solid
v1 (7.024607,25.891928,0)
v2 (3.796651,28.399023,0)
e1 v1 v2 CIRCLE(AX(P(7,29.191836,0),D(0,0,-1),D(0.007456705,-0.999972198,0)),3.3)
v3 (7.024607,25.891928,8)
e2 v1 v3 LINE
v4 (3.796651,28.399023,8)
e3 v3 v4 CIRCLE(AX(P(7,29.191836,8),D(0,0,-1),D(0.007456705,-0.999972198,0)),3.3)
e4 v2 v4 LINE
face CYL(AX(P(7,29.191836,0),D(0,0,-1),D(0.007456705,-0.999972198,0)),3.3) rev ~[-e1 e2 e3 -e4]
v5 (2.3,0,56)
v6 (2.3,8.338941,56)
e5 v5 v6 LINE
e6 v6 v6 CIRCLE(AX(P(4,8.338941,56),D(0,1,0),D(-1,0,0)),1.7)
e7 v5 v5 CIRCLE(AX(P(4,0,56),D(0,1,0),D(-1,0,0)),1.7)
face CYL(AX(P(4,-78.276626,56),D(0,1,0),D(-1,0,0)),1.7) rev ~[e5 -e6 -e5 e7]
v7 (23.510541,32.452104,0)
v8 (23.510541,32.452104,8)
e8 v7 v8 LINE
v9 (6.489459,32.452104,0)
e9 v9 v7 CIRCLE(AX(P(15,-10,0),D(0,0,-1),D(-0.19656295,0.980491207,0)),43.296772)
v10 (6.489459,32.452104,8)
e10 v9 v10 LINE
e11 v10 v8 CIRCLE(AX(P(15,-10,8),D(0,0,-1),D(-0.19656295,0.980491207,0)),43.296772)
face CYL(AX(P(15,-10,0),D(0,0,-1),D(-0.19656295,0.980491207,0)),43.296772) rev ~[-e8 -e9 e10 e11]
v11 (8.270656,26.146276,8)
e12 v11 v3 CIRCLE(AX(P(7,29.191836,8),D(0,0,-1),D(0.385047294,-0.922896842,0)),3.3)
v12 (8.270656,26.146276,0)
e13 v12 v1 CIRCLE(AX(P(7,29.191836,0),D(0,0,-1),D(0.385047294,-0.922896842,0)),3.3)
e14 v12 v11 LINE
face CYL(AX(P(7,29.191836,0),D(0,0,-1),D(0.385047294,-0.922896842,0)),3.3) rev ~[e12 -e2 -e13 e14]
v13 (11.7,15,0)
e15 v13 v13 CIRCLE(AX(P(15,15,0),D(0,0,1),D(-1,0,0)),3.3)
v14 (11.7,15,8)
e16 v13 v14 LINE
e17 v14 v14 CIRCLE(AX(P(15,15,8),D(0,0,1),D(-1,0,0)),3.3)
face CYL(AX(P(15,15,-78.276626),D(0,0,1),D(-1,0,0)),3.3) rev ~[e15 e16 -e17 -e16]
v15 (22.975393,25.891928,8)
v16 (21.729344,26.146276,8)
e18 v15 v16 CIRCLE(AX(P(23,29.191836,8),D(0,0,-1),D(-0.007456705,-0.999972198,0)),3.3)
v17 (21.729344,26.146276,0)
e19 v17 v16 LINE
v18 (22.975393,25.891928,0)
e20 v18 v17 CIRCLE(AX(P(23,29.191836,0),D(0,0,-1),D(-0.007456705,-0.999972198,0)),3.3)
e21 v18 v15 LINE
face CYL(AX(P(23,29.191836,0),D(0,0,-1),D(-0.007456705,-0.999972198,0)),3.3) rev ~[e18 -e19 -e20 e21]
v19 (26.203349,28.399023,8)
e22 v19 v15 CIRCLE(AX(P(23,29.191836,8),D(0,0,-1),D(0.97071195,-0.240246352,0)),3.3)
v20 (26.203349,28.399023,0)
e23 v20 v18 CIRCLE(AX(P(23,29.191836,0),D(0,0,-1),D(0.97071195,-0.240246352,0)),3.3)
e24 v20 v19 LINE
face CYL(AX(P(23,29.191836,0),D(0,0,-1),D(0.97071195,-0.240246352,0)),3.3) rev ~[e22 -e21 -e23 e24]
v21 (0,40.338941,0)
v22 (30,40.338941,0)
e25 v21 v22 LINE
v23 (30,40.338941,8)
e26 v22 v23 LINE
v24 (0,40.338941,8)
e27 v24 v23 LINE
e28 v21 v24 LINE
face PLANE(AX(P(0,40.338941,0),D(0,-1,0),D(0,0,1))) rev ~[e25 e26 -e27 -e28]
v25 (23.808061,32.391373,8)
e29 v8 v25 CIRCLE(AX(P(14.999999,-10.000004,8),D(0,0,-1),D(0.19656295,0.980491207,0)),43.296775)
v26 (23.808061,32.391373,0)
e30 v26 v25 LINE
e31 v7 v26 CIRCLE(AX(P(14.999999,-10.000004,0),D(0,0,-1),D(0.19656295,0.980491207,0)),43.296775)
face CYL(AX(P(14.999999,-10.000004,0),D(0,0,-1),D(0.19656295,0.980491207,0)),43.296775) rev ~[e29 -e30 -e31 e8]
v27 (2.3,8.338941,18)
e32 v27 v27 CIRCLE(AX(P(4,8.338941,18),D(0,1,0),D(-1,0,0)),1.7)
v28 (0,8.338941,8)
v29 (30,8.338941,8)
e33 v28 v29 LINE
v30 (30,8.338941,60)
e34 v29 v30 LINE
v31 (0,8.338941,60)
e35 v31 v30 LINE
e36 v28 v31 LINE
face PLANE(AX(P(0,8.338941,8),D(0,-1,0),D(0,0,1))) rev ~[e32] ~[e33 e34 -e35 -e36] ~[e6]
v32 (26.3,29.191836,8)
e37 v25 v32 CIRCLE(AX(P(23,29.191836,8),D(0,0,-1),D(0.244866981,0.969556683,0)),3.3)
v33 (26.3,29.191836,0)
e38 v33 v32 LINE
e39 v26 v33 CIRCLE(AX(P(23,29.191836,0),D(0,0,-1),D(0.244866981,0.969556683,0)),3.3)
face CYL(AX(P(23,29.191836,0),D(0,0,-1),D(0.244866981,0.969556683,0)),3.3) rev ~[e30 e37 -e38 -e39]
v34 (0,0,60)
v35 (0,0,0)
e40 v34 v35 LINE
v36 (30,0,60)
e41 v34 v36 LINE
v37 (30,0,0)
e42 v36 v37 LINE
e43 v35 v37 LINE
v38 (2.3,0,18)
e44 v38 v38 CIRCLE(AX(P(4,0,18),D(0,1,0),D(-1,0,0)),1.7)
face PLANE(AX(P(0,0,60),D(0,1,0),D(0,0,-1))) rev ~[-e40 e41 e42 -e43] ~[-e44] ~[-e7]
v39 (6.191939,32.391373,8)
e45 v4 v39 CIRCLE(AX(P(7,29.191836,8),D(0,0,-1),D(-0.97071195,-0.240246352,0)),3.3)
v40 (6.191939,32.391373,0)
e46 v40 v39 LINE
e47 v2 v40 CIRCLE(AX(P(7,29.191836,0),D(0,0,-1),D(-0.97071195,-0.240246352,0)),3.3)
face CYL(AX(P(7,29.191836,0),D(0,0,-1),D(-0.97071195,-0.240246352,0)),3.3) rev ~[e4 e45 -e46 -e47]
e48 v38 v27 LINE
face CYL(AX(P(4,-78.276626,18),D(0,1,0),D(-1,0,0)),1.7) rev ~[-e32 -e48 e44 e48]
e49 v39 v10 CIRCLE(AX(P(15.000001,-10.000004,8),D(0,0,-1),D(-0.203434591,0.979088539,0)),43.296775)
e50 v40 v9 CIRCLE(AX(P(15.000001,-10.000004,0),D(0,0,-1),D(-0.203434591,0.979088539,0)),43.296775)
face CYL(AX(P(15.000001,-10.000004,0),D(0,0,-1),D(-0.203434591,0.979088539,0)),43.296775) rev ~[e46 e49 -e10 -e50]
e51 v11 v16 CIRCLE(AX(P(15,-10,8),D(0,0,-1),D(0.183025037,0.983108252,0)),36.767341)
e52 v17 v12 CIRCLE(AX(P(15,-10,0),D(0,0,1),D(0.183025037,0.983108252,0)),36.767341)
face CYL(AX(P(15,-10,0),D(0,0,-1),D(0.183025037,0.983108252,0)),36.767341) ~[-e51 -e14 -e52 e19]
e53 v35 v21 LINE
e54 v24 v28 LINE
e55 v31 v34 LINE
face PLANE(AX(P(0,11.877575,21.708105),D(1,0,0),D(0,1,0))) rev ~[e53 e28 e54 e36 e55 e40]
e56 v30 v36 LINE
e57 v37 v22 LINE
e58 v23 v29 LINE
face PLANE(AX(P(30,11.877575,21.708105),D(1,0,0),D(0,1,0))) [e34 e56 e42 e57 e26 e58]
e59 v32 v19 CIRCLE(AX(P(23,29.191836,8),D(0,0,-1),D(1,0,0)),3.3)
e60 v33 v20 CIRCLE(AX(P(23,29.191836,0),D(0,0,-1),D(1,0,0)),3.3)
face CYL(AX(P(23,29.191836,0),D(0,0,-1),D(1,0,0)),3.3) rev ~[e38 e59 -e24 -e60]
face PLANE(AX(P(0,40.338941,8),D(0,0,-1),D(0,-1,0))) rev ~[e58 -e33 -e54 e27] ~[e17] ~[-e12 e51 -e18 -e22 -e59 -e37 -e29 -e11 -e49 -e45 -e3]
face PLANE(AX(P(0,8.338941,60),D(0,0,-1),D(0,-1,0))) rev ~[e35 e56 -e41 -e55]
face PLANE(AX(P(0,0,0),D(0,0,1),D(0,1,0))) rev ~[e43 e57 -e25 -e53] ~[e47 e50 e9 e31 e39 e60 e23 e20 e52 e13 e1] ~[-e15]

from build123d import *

# Parameters (mm, degrees)
F1_DEPTH = 30
F3_D     = 3.4
F5_DEPTH = 25
F6_D     = 6.6


# Not quite as in the source:
# - a feature names something its author has since deleted; it is built from what else it names


with BuildPart() as f1:
    # F0 (on Right) → F1 (new body)
    with BuildSketch(Plane.YZ):
        Polygon((0, 60), (0, 0), (40.3389412612, 0), (40.3389412612, 8), (8.3389412612, 8), (8.3389412612, 60), align=None)
    extrude(amount=F1_DEPTH)

    # F3 (through all)
    with Locations(Plane.XZ):
        with Locations((4, 56), (4, 18)):
            Hole(F3_D / 2)

    # F4 (on face) → F5 (cut)
    with BuildSketch(Plane(origin=(0, 0, 0), x_dir=(1, 0, 0), z_dir=(0, 0, -1))):
        with BuildLine():
            ThreePointArc((8.2706560702, -26.1462763052), (7.66, -25.9585094241), (7.0246071276, -25.8919276299))
            ThreePointArc((7.0246071276, -25.8919276299), (7.6465318102, -26.0244898096), (8.2706560702, -26.1462763052))
        make_face()
        with BuildLine():
            ThreePointArc((22.9753928724, -25.8919276299), (22.34, -25.9585094241), (21.7293439298, -26.1462763052))
            ThreePointArc((21.7293439298, -26.1462763052), (22.3534681898, -26.0244898096), (22.9753928724, -25.8919276299))
        make_face()
        with BuildLine():
            ThreePointArc((19.7422005642, -29.7178994133), (15, -30), (10.2577994358, -29.7178994133))
            ThreePointArc((10.2577994358, -29.7178994133), (8.9379952514, -31.8628234183), (6.4894588415, -32.4521039296))
            ThreePointArc((6.4894588415, -32.4521039296), (15, -33.2967716909), (23.5105411585, -32.4521039296))
            ThreePointArc((23.5105411585, -32.4521039296), (21.0620047486, -31.8628234183), (19.7422005642, -29.7178994133))
        make_face()
        with BuildLine():
            ThreePointArc((10.3, -29.1918358845), (10.2894329403, -29.455712619), (10.2577994358, -29.7178994133))
            ThreePointArc((10.2577994358, -29.7178994133), (15, -30), (19.7422005642, -29.7178994133))
            ThreePointArc((19.7422005642, -29.7178994133), (20.1162784073, -27.5874201728), (21.7293439298, -26.1462763052))
            ThreePointArc((21.7293439298, -26.1462763052), (15, -26.767340949), (8.2706560702, -26.1462763052))
            ThreePointArc((8.2706560702, -26.1462763052), (9.7461941876, -27.3619677242), (10.3, -29.1918358845))
        make_face()
        with BuildLine():
            ThreePointArc((7.0246071276, -25.8919276299), (4.9757761074, -26.5855899958), (3.7966505642, -28.3990229227))
            ThreePointArc((3.7966505642, -28.3990229227), (7, -29.1918358845), (10.2577994358, -29.7178994133))
            ThreePointArc((10.2577994358, -29.7178994133), (10.2894329403, -29.455712619), (10.3, -29.1918358845))
            ThreePointArc((10.3, -29.1918358845), (9.7461941876, -27.3619677242), (8.2706560702, -26.1462763052))
            ThreePointArc((8.2706560702, -26.1462763052), (7.6465318102, -26.0244898096), (7.0246071276, -25.8919276299))
        make_face()
        with BuildLine():
            ThreePointArc((10.2577994358, -29.7178994133), (7, -29.1918358845), (3.7966505642, -28.3990229227))
            ThreePointArc((3.7966505642, -28.3990229227), (4.170235318, -30.8896084972), (6.1919389643, -32.3913729389))
            ThreePointArc((6.1919389643, -32.3913729389), (6.3406456618, -32.421999261), (6.4894588415, -32.4521039296))
            ThreePointArc((6.4894588415, -32.4521039296), (8.9379952514, -31.8628234183), (10.2577994358, -29.7178994133))
        make_face()
        with BuildLine():
            ThreePointArc((26.2033494358, -28.3990229227), (23, -29.1918358845), (19.7422005642, -29.7178994133))
            ThreePointArc((19.7422005642, -29.7178994133), (21.0620047486, -31.8628234183), (23.5105411585, -32.4521039296))
            ThreePointArc((23.5105411585, -32.4521039296), (23.6593543382, -32.421999261), (23.8080610357, -32.3913729389))
            ThreePointArc((23.8080610357, -32.3913729389), (25.6035169884, -31.2195684337), (26.3, -29.1918358845))
            ThreePointArc((26.3, -29.1918358845), (26.2757482457, -28.7924946382), (26.2033494358, -28.3990229227))
        make_face()
        with BuildLine():
            ThreePointArc((21.7293439298, -26.1462763052), (20.1162784073, -27.5874201728), (19.7422005642, -29.7178994133))
            ThreePointArc((19.7422005642, -29.7178994133), (23, -29.1918358845), (26.2033494358, -28.3990229227))
            ThreePointArc((26.2033494358, -28.3990229227), (25.0242238926, -26.5855899958), (22.9753928724, -25.8919276299))
            ThreePointArc((22.9753928724, -25.8919276299), (22.3534681898, -26.0244898096), (21.7293439298, -26.1462763052))
        make_face()
    extrude(amount=-F5_DEPTH, mode=Mode.SUBTRACT)

    # F6 (through all)
    with Locations(Plane(origin=(0, 0, 0), x_dir=(1, 0, 0), z_dir=(0, 0, -1))):
        with Locations((15, -15)):
            Hole(F6_D / 2)


solid = f1.part
